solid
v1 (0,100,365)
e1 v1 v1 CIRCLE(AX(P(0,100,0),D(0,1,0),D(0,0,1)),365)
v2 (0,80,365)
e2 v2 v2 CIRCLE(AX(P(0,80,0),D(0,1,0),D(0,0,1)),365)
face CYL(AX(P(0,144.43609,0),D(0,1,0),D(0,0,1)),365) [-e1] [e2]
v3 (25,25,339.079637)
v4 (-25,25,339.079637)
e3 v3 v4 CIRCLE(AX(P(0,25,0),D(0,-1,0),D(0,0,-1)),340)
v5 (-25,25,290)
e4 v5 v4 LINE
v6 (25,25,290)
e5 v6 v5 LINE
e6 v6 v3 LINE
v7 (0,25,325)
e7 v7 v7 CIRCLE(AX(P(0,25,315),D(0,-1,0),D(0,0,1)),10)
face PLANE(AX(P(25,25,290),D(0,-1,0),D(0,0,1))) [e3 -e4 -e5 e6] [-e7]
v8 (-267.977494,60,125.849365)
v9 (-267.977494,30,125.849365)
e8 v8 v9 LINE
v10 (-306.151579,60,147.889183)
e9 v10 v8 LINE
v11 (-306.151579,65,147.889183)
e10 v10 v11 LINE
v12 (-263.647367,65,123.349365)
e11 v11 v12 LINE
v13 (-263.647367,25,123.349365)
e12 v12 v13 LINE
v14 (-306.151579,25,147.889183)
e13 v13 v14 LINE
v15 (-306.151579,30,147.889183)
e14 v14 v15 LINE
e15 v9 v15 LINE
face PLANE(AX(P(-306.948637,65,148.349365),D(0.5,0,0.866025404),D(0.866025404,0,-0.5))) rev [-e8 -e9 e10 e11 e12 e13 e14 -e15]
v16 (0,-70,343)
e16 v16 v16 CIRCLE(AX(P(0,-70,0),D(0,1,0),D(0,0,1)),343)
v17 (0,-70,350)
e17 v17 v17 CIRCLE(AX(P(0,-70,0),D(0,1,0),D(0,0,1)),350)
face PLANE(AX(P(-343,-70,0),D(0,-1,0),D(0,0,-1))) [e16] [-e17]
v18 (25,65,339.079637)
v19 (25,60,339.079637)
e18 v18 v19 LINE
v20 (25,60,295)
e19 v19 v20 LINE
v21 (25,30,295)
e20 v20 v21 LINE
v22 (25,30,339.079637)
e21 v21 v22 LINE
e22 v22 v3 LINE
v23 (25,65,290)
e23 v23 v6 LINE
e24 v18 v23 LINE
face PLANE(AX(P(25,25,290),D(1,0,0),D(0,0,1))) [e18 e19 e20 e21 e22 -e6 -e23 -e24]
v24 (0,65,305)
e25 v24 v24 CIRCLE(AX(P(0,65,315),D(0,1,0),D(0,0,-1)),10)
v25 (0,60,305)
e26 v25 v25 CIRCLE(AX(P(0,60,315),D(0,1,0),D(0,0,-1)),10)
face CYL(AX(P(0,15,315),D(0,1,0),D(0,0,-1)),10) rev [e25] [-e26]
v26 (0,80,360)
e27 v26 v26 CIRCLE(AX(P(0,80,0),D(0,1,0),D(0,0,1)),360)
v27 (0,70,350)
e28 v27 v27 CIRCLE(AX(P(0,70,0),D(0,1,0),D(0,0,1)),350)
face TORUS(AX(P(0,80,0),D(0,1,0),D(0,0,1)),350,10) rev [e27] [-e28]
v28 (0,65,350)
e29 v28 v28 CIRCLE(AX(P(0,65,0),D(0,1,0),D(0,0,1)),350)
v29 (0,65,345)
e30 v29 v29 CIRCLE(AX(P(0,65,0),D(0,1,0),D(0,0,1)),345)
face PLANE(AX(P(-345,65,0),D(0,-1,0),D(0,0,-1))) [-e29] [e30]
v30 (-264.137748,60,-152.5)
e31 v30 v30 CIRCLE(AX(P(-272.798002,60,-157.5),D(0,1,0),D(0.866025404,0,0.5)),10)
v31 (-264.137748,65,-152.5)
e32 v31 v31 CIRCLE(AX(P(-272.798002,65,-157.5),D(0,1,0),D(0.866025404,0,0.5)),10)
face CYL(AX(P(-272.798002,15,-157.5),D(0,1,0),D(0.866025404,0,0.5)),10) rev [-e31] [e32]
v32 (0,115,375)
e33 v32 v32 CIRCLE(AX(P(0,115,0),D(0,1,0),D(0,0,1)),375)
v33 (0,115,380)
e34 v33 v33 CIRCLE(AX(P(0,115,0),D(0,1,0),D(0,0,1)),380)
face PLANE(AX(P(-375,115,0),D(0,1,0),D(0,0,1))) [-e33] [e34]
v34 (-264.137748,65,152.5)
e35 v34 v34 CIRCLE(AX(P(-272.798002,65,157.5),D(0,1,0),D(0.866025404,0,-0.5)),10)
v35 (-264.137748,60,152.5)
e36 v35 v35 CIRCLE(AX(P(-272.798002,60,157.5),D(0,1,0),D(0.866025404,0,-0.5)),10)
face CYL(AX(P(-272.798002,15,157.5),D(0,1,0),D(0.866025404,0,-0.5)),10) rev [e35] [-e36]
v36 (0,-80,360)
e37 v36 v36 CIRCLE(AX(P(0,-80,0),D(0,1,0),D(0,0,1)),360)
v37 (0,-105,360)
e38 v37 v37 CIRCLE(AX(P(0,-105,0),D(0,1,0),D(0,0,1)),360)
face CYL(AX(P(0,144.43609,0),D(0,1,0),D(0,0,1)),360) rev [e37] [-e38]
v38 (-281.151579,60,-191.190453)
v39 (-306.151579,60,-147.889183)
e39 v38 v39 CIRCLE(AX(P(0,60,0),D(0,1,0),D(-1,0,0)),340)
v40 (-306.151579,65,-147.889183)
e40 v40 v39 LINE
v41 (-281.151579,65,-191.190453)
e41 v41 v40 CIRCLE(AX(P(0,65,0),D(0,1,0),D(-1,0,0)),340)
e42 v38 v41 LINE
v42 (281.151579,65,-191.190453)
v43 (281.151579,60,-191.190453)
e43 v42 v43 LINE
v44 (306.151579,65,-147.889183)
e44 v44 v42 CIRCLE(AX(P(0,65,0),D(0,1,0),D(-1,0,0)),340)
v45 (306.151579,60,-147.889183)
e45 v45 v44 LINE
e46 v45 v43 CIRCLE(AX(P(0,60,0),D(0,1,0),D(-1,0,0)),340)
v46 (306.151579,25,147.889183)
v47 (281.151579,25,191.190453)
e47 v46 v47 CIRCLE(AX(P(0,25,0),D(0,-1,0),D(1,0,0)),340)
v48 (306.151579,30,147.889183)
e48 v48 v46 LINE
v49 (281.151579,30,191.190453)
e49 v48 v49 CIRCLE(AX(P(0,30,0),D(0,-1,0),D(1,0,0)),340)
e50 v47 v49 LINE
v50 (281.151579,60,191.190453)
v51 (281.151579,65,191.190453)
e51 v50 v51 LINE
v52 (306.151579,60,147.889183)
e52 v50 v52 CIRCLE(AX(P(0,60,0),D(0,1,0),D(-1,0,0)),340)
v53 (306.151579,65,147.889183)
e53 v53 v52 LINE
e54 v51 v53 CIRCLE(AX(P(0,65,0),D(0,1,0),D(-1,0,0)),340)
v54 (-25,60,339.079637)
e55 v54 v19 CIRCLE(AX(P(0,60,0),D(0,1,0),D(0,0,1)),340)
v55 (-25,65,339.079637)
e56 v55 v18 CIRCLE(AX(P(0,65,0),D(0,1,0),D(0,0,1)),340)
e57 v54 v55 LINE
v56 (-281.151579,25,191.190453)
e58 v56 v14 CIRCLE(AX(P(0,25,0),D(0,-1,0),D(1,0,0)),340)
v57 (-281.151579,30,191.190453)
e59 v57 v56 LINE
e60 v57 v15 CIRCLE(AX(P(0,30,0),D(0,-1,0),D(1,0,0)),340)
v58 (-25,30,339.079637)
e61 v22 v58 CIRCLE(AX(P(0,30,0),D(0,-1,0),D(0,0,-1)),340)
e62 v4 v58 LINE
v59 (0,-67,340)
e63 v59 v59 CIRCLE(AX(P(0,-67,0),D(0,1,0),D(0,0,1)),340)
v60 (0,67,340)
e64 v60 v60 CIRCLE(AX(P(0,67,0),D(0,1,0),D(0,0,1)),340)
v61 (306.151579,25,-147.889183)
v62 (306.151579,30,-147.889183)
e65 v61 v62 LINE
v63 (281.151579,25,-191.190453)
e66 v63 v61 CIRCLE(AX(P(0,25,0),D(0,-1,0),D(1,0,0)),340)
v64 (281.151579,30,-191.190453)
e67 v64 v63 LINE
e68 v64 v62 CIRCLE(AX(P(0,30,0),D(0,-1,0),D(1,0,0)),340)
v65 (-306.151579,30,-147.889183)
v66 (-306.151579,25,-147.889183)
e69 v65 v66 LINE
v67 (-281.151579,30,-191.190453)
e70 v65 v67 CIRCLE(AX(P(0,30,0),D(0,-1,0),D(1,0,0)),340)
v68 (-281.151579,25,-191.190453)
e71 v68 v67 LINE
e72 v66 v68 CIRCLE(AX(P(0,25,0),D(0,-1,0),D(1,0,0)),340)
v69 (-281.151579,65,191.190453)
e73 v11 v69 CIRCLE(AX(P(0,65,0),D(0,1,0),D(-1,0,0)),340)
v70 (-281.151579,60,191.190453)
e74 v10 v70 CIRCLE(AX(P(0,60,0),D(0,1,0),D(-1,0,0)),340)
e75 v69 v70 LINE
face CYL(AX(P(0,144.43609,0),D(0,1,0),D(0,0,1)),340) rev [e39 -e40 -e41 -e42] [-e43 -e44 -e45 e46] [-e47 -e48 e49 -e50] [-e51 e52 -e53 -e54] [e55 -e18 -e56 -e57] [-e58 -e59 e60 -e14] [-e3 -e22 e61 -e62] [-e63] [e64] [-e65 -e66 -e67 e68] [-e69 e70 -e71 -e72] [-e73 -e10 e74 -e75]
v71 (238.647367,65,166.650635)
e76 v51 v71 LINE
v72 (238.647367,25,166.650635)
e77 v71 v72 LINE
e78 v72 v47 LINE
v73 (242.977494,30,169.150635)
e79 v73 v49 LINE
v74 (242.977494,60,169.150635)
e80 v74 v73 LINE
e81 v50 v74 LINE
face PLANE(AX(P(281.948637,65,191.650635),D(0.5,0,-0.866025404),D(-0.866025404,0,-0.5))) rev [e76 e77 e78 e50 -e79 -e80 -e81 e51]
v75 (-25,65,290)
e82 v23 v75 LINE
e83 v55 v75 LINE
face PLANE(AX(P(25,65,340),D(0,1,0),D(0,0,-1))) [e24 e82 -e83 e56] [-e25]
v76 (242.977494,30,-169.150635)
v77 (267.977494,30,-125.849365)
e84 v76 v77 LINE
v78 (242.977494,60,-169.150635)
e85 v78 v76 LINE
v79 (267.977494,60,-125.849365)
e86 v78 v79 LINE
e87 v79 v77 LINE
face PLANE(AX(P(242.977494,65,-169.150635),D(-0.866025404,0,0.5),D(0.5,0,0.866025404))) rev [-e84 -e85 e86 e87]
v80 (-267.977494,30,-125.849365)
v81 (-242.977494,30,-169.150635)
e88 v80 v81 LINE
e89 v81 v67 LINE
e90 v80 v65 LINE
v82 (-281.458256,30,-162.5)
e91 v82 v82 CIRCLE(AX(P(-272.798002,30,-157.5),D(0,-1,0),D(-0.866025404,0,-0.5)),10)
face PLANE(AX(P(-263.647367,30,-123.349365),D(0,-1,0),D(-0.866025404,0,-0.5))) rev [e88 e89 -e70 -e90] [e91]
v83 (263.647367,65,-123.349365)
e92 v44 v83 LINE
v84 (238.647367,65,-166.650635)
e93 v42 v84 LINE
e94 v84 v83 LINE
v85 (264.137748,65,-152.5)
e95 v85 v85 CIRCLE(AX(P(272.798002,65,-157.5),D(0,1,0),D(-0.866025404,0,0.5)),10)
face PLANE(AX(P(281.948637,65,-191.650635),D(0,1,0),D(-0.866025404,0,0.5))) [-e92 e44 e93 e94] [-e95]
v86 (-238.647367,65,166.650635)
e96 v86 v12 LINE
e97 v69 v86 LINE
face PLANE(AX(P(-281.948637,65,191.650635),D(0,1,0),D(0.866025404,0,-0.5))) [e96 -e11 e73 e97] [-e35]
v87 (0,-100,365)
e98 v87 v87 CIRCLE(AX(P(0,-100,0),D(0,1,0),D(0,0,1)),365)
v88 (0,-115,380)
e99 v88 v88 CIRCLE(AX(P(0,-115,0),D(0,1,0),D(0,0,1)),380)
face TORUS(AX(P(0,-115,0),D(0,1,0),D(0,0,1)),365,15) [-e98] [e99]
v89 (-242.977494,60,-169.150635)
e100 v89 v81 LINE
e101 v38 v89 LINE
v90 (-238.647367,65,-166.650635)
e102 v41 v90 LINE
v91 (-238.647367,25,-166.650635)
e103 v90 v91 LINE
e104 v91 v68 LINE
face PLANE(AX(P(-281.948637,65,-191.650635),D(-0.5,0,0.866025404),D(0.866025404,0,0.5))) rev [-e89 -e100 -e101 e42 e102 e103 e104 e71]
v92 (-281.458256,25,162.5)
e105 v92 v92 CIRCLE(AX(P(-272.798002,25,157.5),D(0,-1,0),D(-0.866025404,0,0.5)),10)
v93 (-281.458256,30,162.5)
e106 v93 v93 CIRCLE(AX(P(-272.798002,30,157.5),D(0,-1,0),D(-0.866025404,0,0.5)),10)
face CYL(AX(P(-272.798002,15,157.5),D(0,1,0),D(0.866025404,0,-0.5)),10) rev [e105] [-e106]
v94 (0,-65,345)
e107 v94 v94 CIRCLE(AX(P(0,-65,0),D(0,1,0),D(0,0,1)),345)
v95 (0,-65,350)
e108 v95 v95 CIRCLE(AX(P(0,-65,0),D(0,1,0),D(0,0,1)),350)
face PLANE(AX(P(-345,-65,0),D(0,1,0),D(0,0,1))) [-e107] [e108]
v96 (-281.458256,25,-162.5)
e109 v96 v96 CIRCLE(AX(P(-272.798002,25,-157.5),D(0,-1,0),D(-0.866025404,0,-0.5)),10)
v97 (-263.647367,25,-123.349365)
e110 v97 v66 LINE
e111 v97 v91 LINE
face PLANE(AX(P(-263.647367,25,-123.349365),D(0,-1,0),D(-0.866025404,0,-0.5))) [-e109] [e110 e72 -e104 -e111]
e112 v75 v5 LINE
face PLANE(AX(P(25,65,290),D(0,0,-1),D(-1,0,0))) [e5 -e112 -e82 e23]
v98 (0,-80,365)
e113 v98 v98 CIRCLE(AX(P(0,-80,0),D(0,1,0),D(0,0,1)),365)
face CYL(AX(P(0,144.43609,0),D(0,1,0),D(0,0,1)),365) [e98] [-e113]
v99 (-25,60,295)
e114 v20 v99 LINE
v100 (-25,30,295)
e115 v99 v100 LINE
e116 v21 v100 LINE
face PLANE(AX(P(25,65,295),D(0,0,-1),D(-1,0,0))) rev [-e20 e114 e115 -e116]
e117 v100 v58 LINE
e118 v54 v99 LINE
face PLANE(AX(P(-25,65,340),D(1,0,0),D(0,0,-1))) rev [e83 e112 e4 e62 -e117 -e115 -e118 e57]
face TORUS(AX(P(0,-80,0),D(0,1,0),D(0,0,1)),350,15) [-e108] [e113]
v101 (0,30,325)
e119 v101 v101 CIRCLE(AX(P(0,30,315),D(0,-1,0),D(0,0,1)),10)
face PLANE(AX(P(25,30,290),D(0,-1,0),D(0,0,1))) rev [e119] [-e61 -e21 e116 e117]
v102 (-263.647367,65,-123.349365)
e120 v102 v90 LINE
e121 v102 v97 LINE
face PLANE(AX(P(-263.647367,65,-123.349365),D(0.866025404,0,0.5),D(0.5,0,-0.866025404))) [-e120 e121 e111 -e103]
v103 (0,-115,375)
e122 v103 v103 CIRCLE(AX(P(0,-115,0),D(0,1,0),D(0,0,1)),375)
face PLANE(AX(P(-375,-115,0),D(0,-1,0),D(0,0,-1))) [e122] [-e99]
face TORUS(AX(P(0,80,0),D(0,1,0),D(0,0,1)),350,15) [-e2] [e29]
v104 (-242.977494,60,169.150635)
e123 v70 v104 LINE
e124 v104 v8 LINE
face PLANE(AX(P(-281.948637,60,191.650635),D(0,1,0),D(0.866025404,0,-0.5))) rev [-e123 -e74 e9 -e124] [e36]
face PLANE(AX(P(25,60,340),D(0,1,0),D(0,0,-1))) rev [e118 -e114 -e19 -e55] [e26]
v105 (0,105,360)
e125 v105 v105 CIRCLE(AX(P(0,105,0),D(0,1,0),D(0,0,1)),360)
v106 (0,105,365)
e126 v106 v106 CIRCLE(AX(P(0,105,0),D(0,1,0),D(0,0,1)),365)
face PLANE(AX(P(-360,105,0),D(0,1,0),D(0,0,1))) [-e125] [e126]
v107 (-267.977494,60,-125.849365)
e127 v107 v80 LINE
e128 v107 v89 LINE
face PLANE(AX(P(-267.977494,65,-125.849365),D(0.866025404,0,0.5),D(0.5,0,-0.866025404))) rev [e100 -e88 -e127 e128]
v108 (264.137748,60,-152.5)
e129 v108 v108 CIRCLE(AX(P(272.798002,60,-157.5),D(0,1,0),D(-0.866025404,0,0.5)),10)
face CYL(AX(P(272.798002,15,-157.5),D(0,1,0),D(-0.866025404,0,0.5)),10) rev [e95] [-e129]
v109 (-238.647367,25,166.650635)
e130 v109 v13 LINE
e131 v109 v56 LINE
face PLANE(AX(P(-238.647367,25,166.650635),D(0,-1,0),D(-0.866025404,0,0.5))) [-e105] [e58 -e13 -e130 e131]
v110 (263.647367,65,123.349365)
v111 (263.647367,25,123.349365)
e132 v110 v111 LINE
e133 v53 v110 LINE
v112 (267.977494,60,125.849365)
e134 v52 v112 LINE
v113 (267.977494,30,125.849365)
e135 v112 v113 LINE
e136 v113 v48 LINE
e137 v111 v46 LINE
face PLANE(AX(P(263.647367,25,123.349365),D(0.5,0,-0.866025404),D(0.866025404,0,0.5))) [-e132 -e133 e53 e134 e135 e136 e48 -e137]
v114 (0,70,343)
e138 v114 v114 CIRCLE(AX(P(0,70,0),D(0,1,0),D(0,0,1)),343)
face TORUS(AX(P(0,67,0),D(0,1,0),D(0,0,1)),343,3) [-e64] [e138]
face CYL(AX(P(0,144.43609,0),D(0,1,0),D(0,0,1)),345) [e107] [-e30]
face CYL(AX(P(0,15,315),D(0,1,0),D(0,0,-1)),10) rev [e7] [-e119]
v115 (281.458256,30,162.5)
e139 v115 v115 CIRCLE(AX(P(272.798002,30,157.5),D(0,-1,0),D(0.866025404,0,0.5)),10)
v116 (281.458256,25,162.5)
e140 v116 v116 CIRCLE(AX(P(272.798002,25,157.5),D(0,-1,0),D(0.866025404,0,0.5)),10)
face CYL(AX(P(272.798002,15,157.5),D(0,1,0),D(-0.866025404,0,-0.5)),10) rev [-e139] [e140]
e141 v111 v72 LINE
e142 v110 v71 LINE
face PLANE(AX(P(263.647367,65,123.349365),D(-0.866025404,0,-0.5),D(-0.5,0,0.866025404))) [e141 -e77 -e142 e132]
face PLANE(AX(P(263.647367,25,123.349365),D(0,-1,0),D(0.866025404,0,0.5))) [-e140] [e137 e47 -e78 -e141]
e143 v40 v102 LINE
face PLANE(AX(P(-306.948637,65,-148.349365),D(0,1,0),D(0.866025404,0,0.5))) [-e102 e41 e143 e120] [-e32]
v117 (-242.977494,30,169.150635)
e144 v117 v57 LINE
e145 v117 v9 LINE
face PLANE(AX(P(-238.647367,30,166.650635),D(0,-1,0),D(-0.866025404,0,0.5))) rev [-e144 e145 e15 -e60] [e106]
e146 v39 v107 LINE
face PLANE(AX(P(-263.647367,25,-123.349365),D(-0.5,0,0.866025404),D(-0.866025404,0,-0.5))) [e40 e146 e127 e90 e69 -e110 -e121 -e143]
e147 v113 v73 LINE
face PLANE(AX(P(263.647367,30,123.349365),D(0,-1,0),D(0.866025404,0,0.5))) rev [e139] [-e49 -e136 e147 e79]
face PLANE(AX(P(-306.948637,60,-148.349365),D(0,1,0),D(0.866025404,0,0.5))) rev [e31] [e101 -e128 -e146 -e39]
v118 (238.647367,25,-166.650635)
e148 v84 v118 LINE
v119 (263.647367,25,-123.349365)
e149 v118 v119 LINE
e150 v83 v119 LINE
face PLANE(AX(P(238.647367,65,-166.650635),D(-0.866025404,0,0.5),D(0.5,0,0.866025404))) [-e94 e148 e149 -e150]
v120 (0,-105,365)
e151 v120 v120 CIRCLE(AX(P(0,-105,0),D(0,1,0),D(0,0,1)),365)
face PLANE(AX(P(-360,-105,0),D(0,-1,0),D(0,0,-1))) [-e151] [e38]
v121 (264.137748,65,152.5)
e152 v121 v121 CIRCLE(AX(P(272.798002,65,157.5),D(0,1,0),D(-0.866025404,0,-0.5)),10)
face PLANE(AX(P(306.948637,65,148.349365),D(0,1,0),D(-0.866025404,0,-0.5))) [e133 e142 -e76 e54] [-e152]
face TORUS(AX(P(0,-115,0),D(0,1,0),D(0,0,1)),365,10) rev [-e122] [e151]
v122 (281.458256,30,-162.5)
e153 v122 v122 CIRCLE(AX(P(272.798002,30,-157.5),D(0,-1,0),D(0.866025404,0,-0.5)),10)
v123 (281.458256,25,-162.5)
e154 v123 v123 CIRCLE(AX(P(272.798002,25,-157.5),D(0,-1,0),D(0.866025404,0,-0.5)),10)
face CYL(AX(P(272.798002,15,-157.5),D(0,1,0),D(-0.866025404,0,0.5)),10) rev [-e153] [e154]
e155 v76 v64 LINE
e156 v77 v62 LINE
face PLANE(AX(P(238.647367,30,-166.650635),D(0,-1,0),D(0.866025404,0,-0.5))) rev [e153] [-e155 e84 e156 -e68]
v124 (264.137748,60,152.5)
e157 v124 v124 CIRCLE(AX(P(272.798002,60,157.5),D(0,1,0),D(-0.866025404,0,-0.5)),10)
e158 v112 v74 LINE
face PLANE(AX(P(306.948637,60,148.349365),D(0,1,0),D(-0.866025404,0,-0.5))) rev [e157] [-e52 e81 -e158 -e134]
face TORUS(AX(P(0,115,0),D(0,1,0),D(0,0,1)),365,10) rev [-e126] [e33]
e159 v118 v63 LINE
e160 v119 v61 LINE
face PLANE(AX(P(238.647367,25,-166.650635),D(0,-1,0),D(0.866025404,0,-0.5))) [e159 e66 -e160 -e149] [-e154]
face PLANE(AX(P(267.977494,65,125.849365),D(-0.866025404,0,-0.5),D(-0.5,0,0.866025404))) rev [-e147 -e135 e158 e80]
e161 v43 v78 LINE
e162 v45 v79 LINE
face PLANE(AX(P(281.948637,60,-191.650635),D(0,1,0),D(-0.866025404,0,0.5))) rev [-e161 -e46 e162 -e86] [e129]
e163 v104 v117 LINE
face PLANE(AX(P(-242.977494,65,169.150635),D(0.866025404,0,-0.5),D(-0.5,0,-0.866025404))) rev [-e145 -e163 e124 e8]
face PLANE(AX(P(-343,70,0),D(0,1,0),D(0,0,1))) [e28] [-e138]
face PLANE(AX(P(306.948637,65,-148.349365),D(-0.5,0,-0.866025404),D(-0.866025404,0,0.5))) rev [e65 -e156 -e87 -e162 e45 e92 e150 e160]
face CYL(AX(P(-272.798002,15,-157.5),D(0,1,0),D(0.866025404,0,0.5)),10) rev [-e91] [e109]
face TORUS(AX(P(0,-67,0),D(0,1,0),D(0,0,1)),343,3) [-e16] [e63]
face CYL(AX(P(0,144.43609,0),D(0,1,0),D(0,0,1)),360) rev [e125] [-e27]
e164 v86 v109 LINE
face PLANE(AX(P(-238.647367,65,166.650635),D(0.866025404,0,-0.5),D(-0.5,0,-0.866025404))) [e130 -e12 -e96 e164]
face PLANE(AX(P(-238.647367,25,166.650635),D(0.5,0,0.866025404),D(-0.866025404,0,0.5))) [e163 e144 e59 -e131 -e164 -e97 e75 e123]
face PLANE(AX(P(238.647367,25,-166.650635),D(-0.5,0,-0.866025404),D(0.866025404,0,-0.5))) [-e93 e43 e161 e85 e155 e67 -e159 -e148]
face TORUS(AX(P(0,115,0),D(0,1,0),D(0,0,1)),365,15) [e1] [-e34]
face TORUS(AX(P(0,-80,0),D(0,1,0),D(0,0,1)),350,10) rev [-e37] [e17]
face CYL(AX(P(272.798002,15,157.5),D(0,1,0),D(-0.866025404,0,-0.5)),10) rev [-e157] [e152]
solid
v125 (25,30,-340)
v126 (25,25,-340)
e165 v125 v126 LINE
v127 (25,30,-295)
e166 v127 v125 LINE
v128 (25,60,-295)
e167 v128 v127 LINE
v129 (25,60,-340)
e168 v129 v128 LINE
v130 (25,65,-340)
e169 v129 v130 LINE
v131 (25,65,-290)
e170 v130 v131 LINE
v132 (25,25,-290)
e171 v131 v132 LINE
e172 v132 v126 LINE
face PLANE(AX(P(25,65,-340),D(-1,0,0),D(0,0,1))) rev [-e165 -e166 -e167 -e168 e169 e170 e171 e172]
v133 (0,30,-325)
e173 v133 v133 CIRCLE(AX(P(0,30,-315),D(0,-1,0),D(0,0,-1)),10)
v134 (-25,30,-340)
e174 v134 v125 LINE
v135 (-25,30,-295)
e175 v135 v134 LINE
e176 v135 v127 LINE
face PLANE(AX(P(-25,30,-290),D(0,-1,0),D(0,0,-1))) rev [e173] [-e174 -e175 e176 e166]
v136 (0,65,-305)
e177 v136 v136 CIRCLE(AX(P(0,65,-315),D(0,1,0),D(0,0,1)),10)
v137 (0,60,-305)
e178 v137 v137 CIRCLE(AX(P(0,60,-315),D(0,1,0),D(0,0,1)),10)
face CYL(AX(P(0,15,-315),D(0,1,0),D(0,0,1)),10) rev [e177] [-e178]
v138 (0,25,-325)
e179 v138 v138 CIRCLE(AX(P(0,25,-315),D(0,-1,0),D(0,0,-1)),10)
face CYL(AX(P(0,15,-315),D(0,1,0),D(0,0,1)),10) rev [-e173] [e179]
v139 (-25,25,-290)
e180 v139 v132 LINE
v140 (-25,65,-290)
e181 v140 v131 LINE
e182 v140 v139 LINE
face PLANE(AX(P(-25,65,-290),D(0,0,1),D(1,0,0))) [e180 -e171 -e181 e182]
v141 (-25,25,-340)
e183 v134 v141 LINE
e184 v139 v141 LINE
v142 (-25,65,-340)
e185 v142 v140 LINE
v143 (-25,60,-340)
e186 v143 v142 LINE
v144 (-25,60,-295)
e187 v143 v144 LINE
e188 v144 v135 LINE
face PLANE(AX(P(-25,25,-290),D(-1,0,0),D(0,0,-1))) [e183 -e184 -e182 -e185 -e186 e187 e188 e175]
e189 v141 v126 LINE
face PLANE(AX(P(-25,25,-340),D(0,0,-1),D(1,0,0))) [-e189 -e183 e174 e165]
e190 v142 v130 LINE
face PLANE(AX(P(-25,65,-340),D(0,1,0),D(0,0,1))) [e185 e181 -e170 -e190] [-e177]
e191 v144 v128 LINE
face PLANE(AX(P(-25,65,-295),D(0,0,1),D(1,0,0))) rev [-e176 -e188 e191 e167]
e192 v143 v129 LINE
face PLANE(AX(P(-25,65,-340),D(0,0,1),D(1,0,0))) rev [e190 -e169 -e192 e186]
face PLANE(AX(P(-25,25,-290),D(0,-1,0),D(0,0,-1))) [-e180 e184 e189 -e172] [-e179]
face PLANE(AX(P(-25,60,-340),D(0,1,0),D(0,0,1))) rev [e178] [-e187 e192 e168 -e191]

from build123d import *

# Parameters (mm, degrees)
THICKEN2_START     = -25
THICKEN2_DEPTH     = 50
SKETCH4_R          = 10
CUT_EXTRUDE1_DEPTH = 50
CIRPATTERN1_COUNT  = 6


# Read off the part's stored shape, not the designer's step: Thicken2
with BuildPart() as part:
    # Sketch1 → Revolve1 (revolve)
    with BuildSketch(Plane.XY, mode=Mode.PRIVATE) as revolve1_sk:
        with BuildLine():
            Line((-340, -67), (-340, 67))
            ThreePointArc((-340, 67), (-340.878679656, 69.121320344), (-343, 70))
            Line((-343, 70), (-350, 70))
            ThreePointArc((-350, 70), (-357.071067812, 72.928932188), (-360, 80))
            Line((-360, 80), (-360, 105))
            Line((-360, 105), (-365, 105))
            ThreePointArc((-365, 105), (-372.071067812, 107.928932188), (-375, 115))
            Line((-375, 115), (-380, 115))
            ThreePointArc((-380, 115), (-375.606601718, 104.393398282), (-365, 100))
            Line((-365, 100), (-365, 80))
            ThreePointArc((-365, 80), (-360.606601718, 69.393398282), (-350, 65))
            Line((-350, 65), (-345, 65))
            Line((-345, 65), (-345, -65))
            Line((-345, -65), (-350, -65))
            ThreePointArc((-350, -65), (-360.606601718, -69.393398282), (-365, -80))
            Line((-365, -80), (-365, -100))
            ThreePointArc((-365, -100), (-375.606601718, -104.393398282), (-380, -115))
            Line((-380, -115), (-375, -115))
            ThreePointArc((-375, -115), (-372.071067812, -107.928932188), (-365, -105))
            Line((-365, -105), (-360, -105))
            Line((-360, -105), (-360, -80))
            ThreePointArc((-360, -80), (-357.071067812, -72.928932188), (-350, -70))
            Line((-350, -70), (-343, -70))
            ThreePointArc((-343, -70), (-340.878679656, -69.121320344), (-340, -67))
        make_face()
    revolve(revolve1_sk.sketch.rotate(Axis((0, 144.436090226, 0), (0, -1, 0)), 270), axis=Axis((0, 144.436090226, 0), (0, -1, 0)))


with BuildPart() as body_2:
    # Thicken2 outline → Thicken2 (new body)
    with BuildSketch(Plane.YZ.offset(THICKEN2_START)):
        Polygon((25, -290), (25, -340), (30, -340), (30, -295), (60, -295), (60, -340), (65, -340), (65, -290), align=None)
    thicken2 = extrude(amount=THICKEN2_DEPTH)

    # Sketch4 → Cut-Extrude1 (cut)
    with BuildSketch(Plane(origin=(0, 65, 0), x_dir=(1, 0, 0), z_dir=(0, 1, 0))):
        with Locations(Location((0, 315, 0), (0, 0, 90))):
            Circle(SKETCH4_R)
    cut_extrude1 = extrude(amount=-CUT_EXTRUDE1_DEPTH, mode=Mode.SUBTRACT)


with BuildPart() as part_1:
    add(part.part)

    # CirPattern1: Thicken2, Cut-Extrude1 ×6 about axis
    cirpattern1_axis = Axis((0, 0, 0), (0, 1, 0))
    add([thicken2.rotate(cirpattern1_axis, i * 360 / CIRPATTERN1_COUNT) for i in range(1, CIRPATTERN1_COUNT)])
    add([cut_extrude1.rotate(cirpattern1_axis, i * 360 / CIRPATTERN1_COUNT) for i in range(1, CIRPATTERN1_COUNT)], mode=Mode.SUBTRACT)


solid = Compound([body_2.part, part_1.part])
